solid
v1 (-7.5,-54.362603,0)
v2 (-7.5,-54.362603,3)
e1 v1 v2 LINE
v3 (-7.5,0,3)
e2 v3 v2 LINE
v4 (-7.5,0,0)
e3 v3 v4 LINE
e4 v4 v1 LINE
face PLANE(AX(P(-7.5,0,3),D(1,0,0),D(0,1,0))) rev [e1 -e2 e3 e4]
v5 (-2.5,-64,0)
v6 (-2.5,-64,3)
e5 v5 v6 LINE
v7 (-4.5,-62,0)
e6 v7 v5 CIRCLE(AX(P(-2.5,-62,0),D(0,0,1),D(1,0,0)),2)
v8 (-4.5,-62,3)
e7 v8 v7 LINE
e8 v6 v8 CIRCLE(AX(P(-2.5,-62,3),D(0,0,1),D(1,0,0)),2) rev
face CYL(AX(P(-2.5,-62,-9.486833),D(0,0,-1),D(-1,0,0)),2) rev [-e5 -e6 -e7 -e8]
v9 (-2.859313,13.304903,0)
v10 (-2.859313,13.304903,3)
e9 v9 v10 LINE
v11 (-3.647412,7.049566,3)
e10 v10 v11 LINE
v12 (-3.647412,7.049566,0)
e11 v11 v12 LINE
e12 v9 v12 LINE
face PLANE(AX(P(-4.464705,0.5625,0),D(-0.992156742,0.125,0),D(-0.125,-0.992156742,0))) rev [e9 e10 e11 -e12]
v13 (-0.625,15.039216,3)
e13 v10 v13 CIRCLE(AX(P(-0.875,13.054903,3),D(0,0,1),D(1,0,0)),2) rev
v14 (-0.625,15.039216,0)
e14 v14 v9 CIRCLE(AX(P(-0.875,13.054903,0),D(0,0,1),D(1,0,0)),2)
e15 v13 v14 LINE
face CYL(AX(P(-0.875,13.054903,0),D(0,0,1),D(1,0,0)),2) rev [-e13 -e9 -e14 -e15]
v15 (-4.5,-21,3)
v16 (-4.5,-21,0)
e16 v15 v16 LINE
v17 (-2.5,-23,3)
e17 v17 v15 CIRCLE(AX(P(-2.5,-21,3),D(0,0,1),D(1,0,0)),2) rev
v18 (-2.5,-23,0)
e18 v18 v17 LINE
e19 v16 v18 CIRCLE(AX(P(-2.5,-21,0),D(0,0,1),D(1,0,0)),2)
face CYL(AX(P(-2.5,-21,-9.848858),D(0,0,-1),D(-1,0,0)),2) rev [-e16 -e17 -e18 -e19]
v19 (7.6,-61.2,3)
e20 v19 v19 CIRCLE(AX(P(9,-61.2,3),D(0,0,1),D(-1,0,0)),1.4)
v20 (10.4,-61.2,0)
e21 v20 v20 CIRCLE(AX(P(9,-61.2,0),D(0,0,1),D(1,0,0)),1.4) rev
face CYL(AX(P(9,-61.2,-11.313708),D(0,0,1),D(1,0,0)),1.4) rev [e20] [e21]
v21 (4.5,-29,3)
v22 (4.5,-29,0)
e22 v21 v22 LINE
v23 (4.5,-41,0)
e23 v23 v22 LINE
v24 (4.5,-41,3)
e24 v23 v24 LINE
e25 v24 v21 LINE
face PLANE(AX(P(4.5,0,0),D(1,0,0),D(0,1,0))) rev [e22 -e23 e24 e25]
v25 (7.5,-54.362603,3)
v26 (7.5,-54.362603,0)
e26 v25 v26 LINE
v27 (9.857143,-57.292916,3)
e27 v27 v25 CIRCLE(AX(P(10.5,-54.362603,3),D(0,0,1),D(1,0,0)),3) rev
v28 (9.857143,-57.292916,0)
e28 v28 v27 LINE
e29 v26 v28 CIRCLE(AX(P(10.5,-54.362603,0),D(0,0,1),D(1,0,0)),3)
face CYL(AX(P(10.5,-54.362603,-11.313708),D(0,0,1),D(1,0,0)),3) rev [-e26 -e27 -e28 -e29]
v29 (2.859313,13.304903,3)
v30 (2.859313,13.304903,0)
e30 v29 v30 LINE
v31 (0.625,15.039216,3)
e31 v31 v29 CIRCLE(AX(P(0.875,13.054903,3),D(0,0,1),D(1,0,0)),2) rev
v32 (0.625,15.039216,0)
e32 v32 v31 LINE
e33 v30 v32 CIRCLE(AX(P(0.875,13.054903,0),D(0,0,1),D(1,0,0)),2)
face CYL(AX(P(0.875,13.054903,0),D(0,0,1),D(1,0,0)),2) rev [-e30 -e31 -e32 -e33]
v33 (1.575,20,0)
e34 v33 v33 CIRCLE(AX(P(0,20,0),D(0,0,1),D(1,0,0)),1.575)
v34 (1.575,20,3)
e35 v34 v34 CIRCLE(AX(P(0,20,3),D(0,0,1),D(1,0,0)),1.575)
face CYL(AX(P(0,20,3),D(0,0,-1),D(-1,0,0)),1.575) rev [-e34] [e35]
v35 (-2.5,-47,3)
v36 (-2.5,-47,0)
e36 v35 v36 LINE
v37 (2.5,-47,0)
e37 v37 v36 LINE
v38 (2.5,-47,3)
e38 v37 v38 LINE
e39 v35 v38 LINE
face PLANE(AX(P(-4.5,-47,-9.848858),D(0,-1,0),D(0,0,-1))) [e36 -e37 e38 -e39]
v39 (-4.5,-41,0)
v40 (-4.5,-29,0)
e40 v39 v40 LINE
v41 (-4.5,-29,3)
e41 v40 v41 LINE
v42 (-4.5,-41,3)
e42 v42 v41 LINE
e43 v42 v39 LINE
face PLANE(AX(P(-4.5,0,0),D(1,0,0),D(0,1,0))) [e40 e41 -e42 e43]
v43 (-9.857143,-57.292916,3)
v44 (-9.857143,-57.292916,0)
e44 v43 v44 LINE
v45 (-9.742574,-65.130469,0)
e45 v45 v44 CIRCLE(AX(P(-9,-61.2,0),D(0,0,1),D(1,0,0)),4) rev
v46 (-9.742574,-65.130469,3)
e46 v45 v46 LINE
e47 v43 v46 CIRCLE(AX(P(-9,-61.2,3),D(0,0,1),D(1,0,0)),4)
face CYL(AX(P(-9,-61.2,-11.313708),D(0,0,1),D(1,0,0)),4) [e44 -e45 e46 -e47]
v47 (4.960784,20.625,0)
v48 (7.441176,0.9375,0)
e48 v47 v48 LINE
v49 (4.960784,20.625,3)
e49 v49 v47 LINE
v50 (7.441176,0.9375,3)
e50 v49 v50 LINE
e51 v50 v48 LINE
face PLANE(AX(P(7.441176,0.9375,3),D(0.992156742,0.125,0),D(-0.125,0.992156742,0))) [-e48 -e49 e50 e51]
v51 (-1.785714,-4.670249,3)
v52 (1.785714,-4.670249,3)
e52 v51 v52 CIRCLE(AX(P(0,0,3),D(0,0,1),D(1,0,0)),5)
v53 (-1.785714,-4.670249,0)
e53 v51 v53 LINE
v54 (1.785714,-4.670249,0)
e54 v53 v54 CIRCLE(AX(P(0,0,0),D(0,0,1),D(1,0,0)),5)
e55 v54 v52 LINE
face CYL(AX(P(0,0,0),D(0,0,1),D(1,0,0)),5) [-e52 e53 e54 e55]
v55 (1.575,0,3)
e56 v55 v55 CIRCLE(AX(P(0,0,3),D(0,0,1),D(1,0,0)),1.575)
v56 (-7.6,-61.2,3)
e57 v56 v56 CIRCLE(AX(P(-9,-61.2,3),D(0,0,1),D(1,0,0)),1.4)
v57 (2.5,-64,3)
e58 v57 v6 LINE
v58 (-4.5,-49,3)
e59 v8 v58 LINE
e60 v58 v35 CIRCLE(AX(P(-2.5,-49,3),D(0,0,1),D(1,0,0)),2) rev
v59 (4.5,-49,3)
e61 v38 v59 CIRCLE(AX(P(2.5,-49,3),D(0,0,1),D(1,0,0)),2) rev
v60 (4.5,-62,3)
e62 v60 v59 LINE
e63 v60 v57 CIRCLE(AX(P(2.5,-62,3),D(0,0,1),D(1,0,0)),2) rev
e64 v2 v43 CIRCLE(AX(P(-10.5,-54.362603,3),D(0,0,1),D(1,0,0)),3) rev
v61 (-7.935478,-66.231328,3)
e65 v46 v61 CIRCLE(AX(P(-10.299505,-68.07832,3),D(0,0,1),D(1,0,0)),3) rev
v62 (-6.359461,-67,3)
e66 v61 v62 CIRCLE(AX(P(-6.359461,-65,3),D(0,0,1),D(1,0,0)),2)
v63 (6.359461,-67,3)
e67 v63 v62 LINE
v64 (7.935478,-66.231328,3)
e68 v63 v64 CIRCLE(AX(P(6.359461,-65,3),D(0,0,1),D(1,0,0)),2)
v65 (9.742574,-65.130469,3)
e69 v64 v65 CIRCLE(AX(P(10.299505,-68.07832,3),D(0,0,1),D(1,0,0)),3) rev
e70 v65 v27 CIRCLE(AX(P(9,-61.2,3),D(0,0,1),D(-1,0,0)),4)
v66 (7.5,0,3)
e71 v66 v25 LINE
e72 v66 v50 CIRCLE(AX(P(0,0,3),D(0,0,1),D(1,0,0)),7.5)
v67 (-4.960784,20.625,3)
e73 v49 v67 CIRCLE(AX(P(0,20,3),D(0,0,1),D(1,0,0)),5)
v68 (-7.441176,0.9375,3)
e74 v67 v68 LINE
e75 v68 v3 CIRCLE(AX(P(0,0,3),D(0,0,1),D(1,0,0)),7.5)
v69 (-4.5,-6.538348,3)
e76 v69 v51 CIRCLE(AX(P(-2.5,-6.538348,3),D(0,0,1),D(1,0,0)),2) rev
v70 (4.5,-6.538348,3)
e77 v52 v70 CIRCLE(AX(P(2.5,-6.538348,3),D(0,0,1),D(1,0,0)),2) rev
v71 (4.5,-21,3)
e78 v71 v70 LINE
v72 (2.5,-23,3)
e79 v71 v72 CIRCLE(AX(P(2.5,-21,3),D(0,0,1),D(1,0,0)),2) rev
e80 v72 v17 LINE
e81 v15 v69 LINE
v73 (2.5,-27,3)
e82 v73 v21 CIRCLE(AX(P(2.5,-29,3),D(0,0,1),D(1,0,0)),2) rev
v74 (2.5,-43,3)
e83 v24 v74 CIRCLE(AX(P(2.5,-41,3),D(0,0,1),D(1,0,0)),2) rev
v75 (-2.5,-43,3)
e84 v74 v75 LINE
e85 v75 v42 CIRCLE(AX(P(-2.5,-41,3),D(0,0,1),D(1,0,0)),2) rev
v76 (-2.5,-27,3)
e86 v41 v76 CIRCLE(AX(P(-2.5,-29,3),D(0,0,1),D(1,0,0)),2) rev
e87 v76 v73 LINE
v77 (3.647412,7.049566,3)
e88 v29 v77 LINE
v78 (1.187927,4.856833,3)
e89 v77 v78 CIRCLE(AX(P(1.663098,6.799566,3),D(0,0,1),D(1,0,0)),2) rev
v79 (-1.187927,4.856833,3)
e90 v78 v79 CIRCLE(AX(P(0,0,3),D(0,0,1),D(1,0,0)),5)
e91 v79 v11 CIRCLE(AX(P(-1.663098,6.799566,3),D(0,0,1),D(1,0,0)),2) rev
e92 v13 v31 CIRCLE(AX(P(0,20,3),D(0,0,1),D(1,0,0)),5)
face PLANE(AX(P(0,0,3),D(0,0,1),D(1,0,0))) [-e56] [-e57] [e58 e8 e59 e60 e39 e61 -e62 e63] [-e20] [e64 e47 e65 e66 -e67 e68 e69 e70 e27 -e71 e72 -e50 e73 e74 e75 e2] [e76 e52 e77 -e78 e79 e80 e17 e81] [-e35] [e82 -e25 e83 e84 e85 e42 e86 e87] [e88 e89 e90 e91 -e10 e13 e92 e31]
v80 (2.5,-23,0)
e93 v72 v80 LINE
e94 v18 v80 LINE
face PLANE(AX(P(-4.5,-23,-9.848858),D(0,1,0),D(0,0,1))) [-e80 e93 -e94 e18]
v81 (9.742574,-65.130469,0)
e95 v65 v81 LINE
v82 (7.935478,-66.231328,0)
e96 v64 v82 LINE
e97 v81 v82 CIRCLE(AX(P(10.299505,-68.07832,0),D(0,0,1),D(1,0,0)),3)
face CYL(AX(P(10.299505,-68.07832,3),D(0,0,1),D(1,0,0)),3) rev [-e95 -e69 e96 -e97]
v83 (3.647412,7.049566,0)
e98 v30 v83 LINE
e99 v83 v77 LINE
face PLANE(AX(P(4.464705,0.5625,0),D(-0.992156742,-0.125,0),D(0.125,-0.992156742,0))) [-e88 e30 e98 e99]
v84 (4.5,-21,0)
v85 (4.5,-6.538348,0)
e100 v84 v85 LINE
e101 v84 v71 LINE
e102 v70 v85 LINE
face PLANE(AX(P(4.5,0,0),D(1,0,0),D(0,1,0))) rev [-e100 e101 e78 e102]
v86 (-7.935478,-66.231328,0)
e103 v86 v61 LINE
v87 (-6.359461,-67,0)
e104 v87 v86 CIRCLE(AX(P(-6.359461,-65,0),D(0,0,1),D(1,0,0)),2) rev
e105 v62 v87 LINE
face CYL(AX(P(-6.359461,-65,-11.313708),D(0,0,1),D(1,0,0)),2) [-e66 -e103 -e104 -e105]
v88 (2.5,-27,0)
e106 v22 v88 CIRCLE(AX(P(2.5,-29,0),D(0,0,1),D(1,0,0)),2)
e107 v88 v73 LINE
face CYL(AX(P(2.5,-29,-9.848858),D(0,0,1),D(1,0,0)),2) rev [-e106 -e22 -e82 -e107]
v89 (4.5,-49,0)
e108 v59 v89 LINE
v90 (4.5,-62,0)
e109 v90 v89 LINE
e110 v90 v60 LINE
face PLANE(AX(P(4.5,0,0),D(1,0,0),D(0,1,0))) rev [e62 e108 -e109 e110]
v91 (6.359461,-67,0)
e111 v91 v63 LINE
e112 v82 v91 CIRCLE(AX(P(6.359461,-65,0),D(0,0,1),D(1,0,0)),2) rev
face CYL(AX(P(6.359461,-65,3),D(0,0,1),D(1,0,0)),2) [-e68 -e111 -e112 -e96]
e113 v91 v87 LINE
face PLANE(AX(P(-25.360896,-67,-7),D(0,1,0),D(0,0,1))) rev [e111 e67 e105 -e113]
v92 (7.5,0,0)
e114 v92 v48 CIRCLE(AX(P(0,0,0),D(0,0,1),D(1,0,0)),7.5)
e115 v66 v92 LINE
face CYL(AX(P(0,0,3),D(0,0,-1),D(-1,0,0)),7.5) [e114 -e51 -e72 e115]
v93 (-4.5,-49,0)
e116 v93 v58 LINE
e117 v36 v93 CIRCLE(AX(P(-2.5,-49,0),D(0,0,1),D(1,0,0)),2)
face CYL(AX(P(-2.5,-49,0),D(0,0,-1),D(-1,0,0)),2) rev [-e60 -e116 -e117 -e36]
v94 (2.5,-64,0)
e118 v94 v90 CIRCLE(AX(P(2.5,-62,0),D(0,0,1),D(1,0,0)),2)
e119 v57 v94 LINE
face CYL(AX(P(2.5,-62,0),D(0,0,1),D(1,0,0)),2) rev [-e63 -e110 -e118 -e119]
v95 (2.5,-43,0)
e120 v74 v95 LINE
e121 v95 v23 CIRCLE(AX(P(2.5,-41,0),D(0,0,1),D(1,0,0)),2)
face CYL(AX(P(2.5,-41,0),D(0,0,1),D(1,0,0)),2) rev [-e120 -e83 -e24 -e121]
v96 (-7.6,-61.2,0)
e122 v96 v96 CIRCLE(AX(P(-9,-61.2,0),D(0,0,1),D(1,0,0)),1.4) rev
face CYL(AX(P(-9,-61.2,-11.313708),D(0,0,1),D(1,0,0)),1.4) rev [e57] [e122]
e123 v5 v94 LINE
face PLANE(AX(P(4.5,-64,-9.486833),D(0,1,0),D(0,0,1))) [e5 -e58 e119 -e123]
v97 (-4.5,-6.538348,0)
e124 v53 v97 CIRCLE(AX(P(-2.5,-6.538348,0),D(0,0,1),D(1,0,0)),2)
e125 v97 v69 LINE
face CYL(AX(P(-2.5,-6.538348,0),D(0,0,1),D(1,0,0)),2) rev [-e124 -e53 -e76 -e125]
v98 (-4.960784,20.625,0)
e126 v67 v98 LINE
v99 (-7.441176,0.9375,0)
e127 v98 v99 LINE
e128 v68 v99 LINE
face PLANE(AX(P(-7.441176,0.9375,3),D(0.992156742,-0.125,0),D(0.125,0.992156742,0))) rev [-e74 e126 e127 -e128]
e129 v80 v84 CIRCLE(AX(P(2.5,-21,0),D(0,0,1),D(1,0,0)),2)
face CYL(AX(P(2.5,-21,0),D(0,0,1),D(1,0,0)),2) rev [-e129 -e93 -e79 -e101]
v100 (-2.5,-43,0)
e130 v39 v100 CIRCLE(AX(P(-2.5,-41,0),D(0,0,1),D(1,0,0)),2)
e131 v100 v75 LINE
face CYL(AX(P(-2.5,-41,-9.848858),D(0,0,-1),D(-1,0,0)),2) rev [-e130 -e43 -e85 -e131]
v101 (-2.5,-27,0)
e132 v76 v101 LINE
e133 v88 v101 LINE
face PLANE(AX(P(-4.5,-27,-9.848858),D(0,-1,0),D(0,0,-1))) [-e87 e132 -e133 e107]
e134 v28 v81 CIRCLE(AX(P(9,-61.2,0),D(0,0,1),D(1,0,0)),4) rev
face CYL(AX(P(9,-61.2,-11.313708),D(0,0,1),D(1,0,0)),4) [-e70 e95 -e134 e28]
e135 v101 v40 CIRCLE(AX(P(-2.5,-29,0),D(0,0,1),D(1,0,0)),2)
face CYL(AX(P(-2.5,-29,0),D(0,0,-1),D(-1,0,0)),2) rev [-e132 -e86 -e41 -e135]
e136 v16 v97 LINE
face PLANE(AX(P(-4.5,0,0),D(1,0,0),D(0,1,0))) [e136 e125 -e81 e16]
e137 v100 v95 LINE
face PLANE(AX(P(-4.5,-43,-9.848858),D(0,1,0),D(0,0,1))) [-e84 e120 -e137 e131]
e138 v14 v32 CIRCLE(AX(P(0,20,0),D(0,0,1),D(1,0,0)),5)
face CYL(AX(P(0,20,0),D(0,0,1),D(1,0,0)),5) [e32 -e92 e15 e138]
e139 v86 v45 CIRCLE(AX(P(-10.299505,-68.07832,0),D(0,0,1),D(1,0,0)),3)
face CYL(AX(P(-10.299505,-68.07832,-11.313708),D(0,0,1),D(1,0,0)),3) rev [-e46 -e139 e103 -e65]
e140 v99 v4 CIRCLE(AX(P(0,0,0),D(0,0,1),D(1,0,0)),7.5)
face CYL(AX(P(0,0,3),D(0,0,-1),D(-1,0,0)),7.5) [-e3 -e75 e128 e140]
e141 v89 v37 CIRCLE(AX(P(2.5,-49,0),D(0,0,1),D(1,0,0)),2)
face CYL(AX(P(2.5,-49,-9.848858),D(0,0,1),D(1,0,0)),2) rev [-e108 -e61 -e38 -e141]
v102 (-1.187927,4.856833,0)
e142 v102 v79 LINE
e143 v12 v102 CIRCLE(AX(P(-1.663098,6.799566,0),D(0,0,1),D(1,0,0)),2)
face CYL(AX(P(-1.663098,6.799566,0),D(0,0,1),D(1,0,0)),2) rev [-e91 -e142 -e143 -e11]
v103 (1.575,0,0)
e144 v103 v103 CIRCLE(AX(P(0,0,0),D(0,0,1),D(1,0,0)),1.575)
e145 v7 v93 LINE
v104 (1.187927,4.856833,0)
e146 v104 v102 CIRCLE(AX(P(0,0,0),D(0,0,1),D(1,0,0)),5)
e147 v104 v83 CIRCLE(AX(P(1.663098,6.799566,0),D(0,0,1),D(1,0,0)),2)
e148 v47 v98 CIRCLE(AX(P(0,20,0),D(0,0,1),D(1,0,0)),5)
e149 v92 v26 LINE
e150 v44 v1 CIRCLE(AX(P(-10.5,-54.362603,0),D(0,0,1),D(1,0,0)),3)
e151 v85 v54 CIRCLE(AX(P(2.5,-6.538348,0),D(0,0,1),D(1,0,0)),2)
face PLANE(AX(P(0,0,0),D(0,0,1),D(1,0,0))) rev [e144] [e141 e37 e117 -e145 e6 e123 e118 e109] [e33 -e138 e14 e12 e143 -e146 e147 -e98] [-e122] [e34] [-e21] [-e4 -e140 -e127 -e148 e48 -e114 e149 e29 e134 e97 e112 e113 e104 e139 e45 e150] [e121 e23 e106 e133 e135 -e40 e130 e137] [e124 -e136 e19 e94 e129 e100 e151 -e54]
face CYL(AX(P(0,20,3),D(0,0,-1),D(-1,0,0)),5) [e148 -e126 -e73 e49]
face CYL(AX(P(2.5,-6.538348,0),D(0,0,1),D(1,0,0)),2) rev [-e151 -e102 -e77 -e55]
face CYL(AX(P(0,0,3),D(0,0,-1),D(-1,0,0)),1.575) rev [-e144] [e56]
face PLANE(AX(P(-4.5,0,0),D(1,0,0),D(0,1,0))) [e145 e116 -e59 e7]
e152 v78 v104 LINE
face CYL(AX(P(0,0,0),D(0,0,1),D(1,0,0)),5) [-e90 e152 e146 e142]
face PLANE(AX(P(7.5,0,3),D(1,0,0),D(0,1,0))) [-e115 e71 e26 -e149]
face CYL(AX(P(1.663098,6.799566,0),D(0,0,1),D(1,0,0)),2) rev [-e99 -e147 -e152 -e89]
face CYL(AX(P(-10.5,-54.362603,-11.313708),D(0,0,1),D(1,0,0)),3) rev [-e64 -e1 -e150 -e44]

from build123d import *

# Parameters (mm, degrees)
SKETCH_1_R          = 1.575
SKETCH_1_R_2        = 14.5
EXTRUDE_1_DEPTH     = 3
CUT_EXTRUDE_START   = -3
CUT_EXTRUDE_1_DEPTH = 3
SKETCH_3_W          = 9
SKETCH_3_H          = 4
EXTRUDE_2_DEPTH     = 3
SKETCH_4_R          = 4
SKETCH_4_R_2        = 1.4
EXTRUDE_3_DEPTH     = 3
SKETCH_5_W          = 57.078231857
SKETCH_5_H          = 48.607322339
CUT_EXTRUDE_2_DEPTH = 10
SKETCH_6_W          = 9
SKETCH_6_H          = 3
EXTRUDE_4_DEPTH     = 3
FILLET_1_R          = 2
FILLET_2_R          = 3
FILLET_3_R          = 2


with BuildPart() as part:
    # 草图1 → 凸台-拉伸1 (new body)
    with BuildSketch(Plane.XY):
        with BuildLine():
            ThreePointArc((7.5, 0), (7.485279444, 0.469671844), (7.441175562, 0.9375))
            Line((7.441175562, 0.9375), (4.960783708, 20.625))
            ThreePointArc((4.960783708, 20.625), (0, 25), (-4.960783708, 20.625))
            Line((-4.960783708, 20.625), (-7.441175562, 0.9375))
            ThreePointArc((-7.441175562, 0.9375), (-7.485279444, 0.469671844), (-7.5, 0))
            Line((-7.5, 0), (-7.5, -69.31788212))
            ThreePointArc((-7.5, -69.31788212), (0, -112), (7.5, -69.31788212))
            Line((7.5, -69.31788212), (7.5, 0))
        make_face()
        with Locations((-12.374368671, -102.374368671)):
            Circle(SKETCH_1_R, mode=Mode.SUBTRACT)
        with Locations((-12.374368671, -77.625631329)):
            Circle(SKETCH_1_R, mode=Mode.SUBTRACT)
        with Locations((0, -90)):
            Circle(SKETCH_1_R_2, mode=Mode.SUBTRACT)
        with Locations((12.374368671, -102.374368671)):
            Circle(SKETCH_1_R, mode=Mode.SUBTRACT)
        with Locations((12.374368671, -77.625631329)):
            Circle(SKETCH_1_R, mode=Mode.SUBTRACT)
        Circle(SKETCH_1_R, mode=Mode.SUBTRACT)
        with Locations((0, 20)):
            Circle(SKETCH_1_R, mode=Mode.SUBTRACT)
    extrude(amount=EXTRUDE_1_DEPTH)

    # 草图2 → 切除-拉伸1 (cut)
    with BuildSketch(Plane.XY.offset(3).offset(CUT_EXTRUDE_START)):
        with BuildLine():
            Line((0, -68), (0, -5))
            ThreePointArc((0, -5), (-2.655442773, -4.236581603), (-4.5, -2.179449472))
            Line((-4.5, -2.179449472), (-4.5, -68.465144533))
            ThreePointArc((-4.5, -68.465144533), (-2.261988032, -68.116595097), (0, -68))
        make_face()
        with BuildLine():
            ThreePointArc((4.5, -2.179449472), (2.655442773, -4.236581603), (0, -5))
            Line((0, -5), (0, -68))
            ThreePointArc((0, -68), (2.261988032, -68.116595097), (4.5, -68.465144533))
            Line((4.5, -68.465144533), (4.5, -2.179449472))
        make_face()
        with BuildLine():
            Line((-2.557135445, 15.70336663), (-4.192274153, 2.724855487))
            ThreePointArc((-4.192274153, 2.724855487), (0, 5), (4.192274153, 2.724855487))
            Line((4.192274153, 2.724855487), (2.557135445, 15.70336663))
            ThreePointArc((2.557135445, 15.70336663), (0, 15), (-2.557135445, 15.70336663))
        make_face()
    extrude(amount=CUT_EXTRUDE_1_DEPTH, mode=Mode.SUBTRACT)

    # 草图3 → 凸台-拉伸2 (add)
    with BuildSketch(Plane.XY.offset(3)):
        with Locations((0, -45)):
            Rectangle(SKETCH_3_W, SKETCH_3_H)
        with Locations((0, -25)):
            Rectangle(SKETCH_3_W, SKETCH_3_H)
    extrude(amount=-EXTRUDE_2_DEPTH)

    # 草图4 → 凸台-拉伸3 (add)
    # profile 1 of 2: a face of its own
    with BuildSketch(Plane.XY.offset(3)):
        with Locations((-9, -61.2)):
            Circle(SKETCH_4_R)
        with Locations((-9, -61.2)):
            Circle(SKETCH_4_R_2, mode=Mode.SUBTRACT)
    # profile 2 of 2: a face of its own
    with BuildSketch(Plane.XY.offset(3)):
        with Locations((9, -61.2)):
            Circle(SKETCH_4_R)
        with Locations((9, -61.2)):
            Circle(SKETCH_4_R_2, mode=Mode.SUBTRACT)
    extrude(amount=-EXTRUDE_3_DEPTH)

    # 草图5 → 切除-拉伸2 (cut)
    with BuildSketch(Plane.XY.offset(3)):
        with Locations((3.178219729, -91.30366117)):
            Rectangle(SKETCH_5_W, SKETCH_5_H)
    extrude(amount=-CUT_EXTRUDE_2_DEPTH, mode=Mode.SUBTRACT)

    # 草图6 → 凸台-拉伸4 (add)
    with BuildSketch(Plane.XY.offset(3)):
        with Locations((0, -65.5)):
            Rectangle(SKETCH_6_W, SKETCH_6_H)
    extrude(amount=-EXTRUDE_4_DEPTH)

    # 圆角1
    fillet_1_edges = [part.edges().sort_by_distance(p)[0] for p in [
        (-4.5, -27, 1.5),
        (-4.5, -23, 1.5),
        (4.5, -23, 1.5),
        (4.5, -27, 1.5),
        (-2.557135445, 15.70336663, 1.5),
        (2.557135445, 15.70336663, 1.5),
        (4.192274153, 2.724855487, 1.5),
        (-4.192274153, 2.724855487, 1.5),
        (-4.5, -2.179449472, 1.5),
        (4.5, -2.179449472, 1.5),
        (-4.5, -47, 1.5),
        (-4.5, -43, 1.5),
        (4.5, -43, 1.5),
        (4.5, -47, 1.5),
    ]]
    fillet(fillet_1_edges, radius=FILLET_1_R)

    # 圆角2
    # the kernel refuses this fillet: 3 mm, written as the material it adds along each edge
    with BuildSketch(Plane(origin=(-7.5, -64.908099244, 0), x_dir=(0, -1, 0), z_dir=(0, 0, 1))) as fillet_2_piece_1:
        with BuildLine():
            CenterArc((3.170220896, -2.799504541), FILLET_2_R, 111.06581136, 58.235536144)
            Line((0.222369408, -2.242574024), (0.163412378, -2.231435413))
            ThreePointArc((0.163412378, -2.231435413), (0.21267274, -1.11122365), (-0.055621489, -0.0225))
            Line((-0.055621489, -0.0225), (0, 0.06))
            ThreePointArc((0, 0.06), (1.045950378, 0.06), (2.070334354, 0.055990091))
            Line((2.070334354, 0.055990091), (2.091900756, 0))
        make_face()
    extrude(amount=3)
    with BuildSketch(Plane(origin=(-7.5, -57.491900756, 0), x_dir=(0, 1, 0), z_dir=(0, 0, 1))) as fillet_2_piece_2:
        with BuildLine():
            CenterArc((3.129297922, 3), FILLET_2_R, 192.373625116, 77.626374884)
            Line((0.198984851, 2.357142857), (0.14037859, 2.344285714))
            ThreePointArc((0.14037859, 2.344285714), (0.217936404, 1.168572647), (-0.055621489, 0.0225))
            Line((-0.055621489, 0.0225), (0, -0.06))
            Line((0, -0.06), (3.129297922, -0.06))
            Line((3.129297922, -0.06), (3.129297922, 0))
        make_face()
    extrude(amount=3)
    with BuildSketch(Plane(origin=(7.5, -64.908099244, 0), x_dir=(0, -1, 0), z_dir=(0, 0, 1))) as fillet_2_piece_3:
        with BuildLine():
            CenterArc((3.170220896, 2.799504541), FILLET_2_R, 190.698652496, 58.235536144)
            Line((0.222369408, 2.242574024), (0.163412378, 2.231435413))
            ThreePointArc((0.163412378, 2.231435413), (0.21267274, 1.11122365), (-0.055621489, 0.0225))
            Line((-0.055621489, 0.0225), (0, -0.06))
            ThreePointArc((0, -0.06), (1.045950378, -0.06), (2.070334354, -0.055990091))
            Line((2.070334354, -0.055990091), (2.091900756, 0))
        make_face()
    extrude(amount=3)
    with BuildSketch(Plane(origin=(7.5, -57.491900756, 0), x_dir=(0.996455748224994, 0.08411861761445558, 0), z_dir=(0, 0, 1))) as fillet_2_piece_4:
        with BuildLine():
            CenterArc((3.25259946, 2.865851049), FILLET_2_R, 175.17465614, 77.626374884)
            Line((0.263232215, 3.118206902), (0.20344487, 3.123254019))
            Line((0.20344487, 3.123254019), (-0.059787345, 0.005047117))
            Line((-0.059787345, 0.005047117), (0.017741452, -0.057317021))
            ThreePointArc((0.017741452, -0.057317021), (1.18276344, 0.118865267), (2.347785428, -0.057317021))
            Line((2.347785428, -0.057317021), (2.36552688, 0))
        make_face()
    extrude(amount=3)

    # 圆角3
    fillet_3_edges = [part.edges().sort_by_distance(p)[0] for p in [
        (-7.5, -67, 1.5),
        (7.5, -67, 1.5),
        (-4.5, -64, 1.5),
        (4.5, -64, 1.5),
    ]]
    fillet(fillet_3_edges, radius=FILLET_3_R)


solid = part.part
